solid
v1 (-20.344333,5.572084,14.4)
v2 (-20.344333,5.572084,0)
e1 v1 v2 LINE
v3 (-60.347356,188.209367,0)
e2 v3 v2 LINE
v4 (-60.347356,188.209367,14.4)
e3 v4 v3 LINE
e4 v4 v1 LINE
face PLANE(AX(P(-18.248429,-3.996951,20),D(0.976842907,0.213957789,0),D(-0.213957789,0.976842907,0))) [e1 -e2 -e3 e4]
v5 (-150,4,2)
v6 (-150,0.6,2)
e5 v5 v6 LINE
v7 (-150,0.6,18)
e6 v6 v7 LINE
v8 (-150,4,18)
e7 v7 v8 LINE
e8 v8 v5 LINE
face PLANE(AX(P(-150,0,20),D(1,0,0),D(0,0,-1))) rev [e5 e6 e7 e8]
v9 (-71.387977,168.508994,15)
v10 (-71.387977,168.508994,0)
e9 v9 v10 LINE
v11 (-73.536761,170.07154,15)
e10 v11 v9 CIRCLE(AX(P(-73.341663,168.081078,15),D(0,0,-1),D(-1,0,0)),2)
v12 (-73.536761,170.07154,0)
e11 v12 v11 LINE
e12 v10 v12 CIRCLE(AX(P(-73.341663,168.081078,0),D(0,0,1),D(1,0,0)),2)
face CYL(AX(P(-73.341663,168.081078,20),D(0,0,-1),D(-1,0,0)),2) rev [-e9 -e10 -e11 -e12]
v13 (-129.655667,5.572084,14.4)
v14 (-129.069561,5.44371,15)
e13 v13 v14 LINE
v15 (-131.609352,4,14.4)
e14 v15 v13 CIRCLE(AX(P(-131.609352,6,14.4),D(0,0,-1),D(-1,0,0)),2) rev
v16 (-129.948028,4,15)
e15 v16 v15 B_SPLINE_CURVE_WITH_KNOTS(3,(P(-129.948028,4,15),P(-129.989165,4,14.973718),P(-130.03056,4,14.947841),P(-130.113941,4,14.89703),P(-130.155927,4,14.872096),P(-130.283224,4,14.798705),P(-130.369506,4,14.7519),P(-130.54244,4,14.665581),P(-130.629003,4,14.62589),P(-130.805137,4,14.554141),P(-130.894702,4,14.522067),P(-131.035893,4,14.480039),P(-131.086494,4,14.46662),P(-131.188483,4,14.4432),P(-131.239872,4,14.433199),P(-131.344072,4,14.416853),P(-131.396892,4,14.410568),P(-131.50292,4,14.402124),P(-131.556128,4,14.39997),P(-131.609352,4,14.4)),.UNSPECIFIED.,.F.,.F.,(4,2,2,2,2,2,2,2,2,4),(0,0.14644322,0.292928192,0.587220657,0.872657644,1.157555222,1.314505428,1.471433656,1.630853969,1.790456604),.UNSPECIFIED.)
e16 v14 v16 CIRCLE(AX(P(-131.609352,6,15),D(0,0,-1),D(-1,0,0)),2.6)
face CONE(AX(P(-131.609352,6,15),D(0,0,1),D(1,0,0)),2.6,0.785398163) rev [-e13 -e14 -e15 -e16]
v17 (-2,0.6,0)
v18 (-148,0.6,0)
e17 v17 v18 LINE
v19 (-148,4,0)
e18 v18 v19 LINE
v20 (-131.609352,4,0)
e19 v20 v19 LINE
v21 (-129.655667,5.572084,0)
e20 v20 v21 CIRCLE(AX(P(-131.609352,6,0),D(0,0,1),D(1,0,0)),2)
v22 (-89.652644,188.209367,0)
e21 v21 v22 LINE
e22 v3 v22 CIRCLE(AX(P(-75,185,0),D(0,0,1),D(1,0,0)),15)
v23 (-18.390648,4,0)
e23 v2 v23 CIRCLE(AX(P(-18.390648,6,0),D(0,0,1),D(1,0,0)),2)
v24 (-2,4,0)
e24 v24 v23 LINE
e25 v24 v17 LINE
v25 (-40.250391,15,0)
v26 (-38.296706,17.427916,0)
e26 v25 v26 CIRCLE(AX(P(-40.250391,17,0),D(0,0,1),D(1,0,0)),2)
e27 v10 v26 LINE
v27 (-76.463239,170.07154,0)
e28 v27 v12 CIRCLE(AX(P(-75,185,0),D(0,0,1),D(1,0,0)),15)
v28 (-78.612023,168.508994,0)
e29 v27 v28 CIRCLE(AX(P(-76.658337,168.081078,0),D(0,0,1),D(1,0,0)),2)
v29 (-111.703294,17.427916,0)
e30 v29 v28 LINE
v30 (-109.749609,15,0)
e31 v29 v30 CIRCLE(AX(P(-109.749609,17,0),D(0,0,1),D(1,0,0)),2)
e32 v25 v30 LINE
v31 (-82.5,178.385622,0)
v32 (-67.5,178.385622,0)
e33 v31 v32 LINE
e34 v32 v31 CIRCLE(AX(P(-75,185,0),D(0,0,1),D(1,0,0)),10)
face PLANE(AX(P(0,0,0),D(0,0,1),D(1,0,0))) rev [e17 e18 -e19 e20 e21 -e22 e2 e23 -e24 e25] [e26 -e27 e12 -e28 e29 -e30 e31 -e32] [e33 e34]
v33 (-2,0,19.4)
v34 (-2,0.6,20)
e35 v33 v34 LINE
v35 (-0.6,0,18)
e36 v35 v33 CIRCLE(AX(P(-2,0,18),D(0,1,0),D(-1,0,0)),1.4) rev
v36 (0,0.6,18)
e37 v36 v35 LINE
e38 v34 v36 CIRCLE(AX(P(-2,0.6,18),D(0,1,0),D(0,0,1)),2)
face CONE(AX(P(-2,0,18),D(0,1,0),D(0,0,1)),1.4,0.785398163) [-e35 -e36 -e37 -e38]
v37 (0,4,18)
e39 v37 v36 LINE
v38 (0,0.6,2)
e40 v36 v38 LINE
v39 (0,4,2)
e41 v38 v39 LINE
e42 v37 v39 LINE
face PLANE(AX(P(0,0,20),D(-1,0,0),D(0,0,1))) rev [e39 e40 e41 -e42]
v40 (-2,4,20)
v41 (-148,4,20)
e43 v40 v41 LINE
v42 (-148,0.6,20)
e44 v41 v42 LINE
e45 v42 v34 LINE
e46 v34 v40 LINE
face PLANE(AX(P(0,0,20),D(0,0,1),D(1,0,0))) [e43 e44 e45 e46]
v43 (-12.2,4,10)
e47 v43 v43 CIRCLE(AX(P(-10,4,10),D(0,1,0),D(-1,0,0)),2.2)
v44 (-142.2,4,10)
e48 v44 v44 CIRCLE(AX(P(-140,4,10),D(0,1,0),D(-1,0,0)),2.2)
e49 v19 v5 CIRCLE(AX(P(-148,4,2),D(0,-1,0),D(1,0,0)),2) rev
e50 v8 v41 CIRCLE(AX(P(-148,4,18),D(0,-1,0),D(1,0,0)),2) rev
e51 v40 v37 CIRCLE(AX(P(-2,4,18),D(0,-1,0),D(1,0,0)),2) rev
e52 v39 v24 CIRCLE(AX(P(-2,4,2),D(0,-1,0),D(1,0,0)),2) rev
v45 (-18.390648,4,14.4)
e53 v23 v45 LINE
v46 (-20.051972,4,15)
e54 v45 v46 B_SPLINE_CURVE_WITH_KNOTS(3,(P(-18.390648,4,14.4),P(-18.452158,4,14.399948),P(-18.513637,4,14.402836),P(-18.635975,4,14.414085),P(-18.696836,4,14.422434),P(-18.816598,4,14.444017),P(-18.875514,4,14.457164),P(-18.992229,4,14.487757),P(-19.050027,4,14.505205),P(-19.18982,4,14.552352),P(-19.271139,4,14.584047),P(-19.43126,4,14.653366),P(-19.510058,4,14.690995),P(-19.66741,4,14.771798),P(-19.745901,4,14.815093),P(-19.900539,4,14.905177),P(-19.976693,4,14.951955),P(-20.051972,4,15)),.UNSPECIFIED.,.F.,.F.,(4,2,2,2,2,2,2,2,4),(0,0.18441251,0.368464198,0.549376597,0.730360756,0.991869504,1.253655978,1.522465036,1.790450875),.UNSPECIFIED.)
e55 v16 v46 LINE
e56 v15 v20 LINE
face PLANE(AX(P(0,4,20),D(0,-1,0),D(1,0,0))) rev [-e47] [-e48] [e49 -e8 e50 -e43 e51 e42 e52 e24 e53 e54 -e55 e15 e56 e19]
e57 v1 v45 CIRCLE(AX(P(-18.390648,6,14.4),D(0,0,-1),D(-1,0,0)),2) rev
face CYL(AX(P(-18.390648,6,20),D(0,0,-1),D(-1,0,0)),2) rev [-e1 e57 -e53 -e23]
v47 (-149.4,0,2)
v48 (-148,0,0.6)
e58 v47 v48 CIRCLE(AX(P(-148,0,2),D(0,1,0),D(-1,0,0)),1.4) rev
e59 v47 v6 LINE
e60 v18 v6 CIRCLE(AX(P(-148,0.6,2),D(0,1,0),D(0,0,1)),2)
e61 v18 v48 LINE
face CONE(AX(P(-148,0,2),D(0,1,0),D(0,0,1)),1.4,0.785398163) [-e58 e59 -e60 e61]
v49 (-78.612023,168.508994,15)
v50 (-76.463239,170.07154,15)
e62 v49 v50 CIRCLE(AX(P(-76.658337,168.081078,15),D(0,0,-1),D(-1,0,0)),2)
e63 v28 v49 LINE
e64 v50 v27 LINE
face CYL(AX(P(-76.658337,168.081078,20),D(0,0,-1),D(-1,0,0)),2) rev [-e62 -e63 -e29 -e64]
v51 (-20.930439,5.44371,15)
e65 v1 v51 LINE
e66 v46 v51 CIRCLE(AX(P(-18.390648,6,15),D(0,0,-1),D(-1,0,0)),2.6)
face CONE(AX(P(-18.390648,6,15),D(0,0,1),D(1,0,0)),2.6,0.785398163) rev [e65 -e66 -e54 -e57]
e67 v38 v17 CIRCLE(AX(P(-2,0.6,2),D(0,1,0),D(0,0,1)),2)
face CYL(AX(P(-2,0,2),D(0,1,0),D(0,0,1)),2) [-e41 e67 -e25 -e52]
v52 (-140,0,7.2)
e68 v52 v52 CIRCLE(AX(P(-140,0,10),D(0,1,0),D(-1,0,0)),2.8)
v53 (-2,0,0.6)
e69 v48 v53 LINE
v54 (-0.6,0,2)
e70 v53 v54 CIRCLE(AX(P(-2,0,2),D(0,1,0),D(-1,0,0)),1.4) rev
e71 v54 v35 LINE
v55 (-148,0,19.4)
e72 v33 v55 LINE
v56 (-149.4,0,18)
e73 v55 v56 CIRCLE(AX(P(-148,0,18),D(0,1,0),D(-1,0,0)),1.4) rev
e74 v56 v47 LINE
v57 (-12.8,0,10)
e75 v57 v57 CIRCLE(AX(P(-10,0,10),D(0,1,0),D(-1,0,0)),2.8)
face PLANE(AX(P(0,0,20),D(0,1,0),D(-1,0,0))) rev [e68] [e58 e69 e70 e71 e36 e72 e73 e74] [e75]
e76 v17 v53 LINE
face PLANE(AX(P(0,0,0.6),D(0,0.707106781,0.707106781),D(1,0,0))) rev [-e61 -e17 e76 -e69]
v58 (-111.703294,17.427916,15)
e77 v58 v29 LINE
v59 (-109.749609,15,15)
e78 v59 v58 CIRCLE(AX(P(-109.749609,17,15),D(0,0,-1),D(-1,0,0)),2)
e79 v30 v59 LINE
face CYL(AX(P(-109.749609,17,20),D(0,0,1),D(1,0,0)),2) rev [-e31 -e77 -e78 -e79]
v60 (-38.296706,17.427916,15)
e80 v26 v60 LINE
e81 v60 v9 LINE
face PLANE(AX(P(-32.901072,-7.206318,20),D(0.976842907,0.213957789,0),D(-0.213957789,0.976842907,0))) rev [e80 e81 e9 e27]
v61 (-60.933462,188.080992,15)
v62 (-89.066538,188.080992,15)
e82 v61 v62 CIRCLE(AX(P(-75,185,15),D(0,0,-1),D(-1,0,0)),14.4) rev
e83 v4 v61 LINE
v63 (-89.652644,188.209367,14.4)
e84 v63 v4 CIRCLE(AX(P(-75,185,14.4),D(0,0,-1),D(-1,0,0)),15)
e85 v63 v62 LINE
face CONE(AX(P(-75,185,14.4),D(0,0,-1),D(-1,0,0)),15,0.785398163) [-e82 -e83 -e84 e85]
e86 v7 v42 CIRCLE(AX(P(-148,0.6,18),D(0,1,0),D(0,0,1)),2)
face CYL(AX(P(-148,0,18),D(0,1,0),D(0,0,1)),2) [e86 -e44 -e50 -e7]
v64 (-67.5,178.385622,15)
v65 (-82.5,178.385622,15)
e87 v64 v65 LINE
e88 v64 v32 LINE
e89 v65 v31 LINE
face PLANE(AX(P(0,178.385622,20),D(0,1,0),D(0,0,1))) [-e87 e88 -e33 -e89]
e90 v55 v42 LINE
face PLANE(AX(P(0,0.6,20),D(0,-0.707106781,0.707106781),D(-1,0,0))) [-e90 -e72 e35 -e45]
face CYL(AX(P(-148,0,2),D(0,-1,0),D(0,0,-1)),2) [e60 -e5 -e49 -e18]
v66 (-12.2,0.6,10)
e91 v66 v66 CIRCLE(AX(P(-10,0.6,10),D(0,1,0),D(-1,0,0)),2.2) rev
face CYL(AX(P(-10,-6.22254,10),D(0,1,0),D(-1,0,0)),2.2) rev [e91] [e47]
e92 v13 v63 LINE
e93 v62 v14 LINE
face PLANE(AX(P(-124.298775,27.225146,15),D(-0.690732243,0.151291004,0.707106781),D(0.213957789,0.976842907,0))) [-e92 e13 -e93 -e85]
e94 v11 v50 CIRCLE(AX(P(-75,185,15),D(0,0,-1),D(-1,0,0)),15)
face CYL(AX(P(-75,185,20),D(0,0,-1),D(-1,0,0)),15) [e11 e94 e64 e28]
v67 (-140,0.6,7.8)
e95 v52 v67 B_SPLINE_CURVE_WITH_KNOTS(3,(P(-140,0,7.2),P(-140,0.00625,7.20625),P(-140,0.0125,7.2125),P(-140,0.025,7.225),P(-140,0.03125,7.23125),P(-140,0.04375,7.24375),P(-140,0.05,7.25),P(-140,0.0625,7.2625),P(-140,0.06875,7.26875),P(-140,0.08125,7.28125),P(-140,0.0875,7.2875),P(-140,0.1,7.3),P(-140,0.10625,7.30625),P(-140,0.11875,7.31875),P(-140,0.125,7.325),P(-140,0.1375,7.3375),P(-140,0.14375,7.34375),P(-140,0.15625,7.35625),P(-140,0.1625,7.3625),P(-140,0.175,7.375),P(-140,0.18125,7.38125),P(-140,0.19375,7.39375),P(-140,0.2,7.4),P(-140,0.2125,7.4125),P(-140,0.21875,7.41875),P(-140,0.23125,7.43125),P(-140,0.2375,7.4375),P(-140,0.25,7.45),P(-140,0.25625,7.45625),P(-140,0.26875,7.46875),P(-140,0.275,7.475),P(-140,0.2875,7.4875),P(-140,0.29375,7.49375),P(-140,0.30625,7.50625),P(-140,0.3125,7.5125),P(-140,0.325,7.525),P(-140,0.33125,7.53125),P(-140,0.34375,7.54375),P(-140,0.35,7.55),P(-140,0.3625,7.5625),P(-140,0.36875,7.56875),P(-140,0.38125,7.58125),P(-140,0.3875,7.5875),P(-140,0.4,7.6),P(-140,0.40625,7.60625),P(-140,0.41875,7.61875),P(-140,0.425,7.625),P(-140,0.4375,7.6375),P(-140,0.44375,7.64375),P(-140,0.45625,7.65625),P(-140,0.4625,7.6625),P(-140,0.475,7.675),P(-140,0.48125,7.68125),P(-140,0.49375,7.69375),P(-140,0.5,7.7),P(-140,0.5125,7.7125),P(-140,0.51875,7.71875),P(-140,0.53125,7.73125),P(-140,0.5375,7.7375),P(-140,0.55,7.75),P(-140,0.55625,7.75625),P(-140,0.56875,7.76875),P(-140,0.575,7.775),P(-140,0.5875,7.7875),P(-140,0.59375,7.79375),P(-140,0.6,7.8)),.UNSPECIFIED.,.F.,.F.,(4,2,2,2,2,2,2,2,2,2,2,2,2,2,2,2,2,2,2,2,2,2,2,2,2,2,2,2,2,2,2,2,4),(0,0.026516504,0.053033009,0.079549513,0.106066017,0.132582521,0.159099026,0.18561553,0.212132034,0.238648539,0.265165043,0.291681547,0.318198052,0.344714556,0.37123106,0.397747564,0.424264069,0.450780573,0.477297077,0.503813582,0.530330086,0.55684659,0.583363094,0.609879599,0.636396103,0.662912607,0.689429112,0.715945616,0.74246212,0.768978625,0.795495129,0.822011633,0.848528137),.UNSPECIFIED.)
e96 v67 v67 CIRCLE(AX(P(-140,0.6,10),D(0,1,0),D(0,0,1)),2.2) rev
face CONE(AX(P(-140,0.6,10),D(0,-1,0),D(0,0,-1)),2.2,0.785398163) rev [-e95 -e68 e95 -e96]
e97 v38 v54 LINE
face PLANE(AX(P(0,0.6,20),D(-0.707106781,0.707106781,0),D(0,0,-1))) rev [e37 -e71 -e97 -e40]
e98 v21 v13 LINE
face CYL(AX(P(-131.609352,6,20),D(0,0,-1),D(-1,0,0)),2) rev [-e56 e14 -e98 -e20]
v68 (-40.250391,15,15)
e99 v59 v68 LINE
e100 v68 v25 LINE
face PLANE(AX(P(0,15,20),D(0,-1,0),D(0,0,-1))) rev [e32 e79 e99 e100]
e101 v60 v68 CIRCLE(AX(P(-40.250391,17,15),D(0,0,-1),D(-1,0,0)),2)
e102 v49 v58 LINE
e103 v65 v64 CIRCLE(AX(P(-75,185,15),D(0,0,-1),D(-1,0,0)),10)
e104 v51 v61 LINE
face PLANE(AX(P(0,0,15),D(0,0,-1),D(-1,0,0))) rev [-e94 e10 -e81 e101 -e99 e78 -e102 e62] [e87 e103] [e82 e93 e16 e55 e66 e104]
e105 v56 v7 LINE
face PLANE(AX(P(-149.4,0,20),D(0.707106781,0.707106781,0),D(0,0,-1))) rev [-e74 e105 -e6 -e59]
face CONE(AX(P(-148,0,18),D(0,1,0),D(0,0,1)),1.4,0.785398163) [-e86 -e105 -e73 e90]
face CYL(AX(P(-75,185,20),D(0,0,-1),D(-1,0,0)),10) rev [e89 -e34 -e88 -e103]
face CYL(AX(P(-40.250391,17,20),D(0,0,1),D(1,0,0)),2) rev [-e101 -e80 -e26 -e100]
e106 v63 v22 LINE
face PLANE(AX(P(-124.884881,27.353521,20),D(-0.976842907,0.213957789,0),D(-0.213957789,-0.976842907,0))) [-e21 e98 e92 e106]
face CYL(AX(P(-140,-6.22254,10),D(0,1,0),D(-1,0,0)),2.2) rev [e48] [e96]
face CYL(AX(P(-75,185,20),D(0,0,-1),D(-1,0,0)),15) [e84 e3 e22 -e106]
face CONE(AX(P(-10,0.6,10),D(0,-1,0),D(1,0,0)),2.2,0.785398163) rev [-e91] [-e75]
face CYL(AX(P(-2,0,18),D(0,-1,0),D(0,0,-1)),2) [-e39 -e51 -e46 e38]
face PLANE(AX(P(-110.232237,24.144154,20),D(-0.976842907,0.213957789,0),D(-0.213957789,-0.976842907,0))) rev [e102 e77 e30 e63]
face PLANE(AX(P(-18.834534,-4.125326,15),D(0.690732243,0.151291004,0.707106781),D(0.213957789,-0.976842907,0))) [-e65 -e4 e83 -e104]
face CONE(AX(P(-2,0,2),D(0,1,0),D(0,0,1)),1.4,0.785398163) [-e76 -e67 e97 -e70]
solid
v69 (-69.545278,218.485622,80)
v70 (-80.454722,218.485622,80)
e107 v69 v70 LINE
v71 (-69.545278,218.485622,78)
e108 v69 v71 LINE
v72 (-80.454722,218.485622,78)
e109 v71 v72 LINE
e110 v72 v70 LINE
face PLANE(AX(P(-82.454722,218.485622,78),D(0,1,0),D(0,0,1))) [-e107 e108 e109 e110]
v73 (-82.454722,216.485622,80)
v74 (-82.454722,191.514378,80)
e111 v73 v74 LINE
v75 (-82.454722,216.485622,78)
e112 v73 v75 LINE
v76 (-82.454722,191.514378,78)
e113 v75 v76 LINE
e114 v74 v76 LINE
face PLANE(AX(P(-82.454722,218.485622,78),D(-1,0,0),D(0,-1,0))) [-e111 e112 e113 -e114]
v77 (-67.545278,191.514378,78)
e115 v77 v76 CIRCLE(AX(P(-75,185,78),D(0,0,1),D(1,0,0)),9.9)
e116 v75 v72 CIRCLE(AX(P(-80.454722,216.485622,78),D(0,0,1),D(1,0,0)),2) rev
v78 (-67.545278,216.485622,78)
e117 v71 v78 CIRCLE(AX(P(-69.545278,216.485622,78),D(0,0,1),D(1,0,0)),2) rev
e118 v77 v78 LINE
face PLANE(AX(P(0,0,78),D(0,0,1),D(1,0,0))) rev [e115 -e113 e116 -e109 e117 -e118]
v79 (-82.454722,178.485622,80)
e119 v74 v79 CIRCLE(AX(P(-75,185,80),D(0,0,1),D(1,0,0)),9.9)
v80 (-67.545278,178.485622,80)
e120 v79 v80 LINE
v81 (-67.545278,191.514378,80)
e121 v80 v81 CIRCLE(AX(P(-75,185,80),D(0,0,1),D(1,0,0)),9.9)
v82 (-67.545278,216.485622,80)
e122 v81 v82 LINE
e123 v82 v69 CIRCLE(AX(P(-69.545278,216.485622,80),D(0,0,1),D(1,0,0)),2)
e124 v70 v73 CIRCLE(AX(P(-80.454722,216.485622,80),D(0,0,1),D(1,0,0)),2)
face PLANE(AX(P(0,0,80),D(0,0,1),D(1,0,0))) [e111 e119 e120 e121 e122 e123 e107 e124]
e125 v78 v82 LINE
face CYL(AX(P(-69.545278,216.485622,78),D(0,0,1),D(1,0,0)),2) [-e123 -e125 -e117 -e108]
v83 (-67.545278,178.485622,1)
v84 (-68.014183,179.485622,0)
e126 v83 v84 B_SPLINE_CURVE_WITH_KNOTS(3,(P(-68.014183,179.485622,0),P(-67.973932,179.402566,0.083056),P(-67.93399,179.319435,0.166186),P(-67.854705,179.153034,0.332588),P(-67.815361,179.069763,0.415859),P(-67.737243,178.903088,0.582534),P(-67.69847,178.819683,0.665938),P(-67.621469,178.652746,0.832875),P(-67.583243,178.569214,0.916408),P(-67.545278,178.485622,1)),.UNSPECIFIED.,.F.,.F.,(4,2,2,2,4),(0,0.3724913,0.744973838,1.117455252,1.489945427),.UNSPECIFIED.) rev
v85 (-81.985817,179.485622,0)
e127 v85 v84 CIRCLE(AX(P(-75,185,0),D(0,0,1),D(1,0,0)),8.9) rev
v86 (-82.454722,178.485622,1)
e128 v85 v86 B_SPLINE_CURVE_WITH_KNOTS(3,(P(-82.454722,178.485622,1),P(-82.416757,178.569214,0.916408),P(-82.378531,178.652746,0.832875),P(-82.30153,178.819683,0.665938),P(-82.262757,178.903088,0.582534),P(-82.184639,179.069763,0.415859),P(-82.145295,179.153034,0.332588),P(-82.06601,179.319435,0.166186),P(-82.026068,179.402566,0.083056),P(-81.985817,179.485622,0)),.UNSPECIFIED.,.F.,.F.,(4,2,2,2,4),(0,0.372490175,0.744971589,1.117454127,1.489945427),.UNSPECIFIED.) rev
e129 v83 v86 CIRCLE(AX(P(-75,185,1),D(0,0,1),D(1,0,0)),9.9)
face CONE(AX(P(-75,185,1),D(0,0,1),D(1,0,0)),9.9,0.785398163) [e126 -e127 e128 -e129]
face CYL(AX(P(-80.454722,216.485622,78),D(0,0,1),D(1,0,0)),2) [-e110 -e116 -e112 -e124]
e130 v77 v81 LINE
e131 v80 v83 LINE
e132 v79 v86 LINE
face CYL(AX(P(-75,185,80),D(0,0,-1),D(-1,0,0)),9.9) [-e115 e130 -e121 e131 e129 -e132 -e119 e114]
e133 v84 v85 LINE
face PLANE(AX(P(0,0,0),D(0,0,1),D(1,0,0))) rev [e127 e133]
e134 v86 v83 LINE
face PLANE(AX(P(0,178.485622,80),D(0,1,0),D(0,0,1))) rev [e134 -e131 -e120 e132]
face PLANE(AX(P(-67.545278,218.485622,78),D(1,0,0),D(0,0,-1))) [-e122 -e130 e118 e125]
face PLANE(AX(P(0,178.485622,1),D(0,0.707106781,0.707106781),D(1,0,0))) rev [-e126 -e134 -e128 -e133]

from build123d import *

# Parameters (mm, degrees)
BOSS_EXTRUDE1_DEPTH = 20
SKETCH2_W           = 110
SKETCH2_H           = 232.935125723
CUT_EXTRUDE1_DEPTH  = 5
BOSS_EXTRUDE2_DEPTH = 80
SKETCH3_W           = 14.909443404
SKETCH3_H           = 40
BOSS_EXTRUDE3_DEPTH = 2
SKETCH4_R           = 2.2
CUT_EXTRUDE2_DEPTH  = 4
FILLET1_R           = 2
CHAMFER1_SIZE       = 0.6
CHAMFER2_SIZE       = 1
FILLET2_R           = 2
CHAMFER3_SIZE       = 0.6


with BuildPart() as part:
    # Sketch1 → Boss-Extrude1 (new body)
    with BuildSketch(Plane.XY):
        with BuildLine():
            Line((-60.347356399, 188.20936684), (-20, 4))
            Line((-20, 4), (0, 4))
            Line((0, 4), (0, 0))
            Line((0, 0), (-150, 0))
            Line((-150, 0), (-150, 4))
            Line((-150, 4), (-130, 4))
            Line((-130, 4), (-89.652643601, 188.20936684))
            ThreePointArc((-89.652643601, 188.20936684), (-75, 200), (-60.347356399, 188.20936684))
        make_face()
        with BuildLine():
            Line((-112.235080417, 15), (-78.20936684, 170.347356399))
            ThreePointArc((-78.20936684, 170.347356399), (-75, 170), (-71.79063316, 170.347356399))
            Line((-71.79063316, 170.347356399), (-37.764919583, 15))
            Line((-37.764919583, 15), (-112.235080417, 15))
        make_face(mode=Mode.SUBTRACT)
        with BuildLine():
            ThreePointArc((-67.5, 178.385621722), (-75, 195), (-82.5, 178.385621722))
            Line((-82.5, 178.385621722), (-67.5, 178.385621722))
        make_face(mode=Mode.SUBTRACT)
    extrude(amount=BOSS_EXTRUDE1_DEPTH)

    # Sketch2 → Cut-Extrude1 (cut)
    with BuildSketch(Plane.XY.offset(20)):
        with Locations((-75, 120.467562862)):
            Rectangle(SKETCH2_W, SKETCH2_H)
    extrude(amount=-CUT_EXTRUDE1_DEPTH, mode=Mode.SUBTRACT)

    # Sketch4 → Cut-Extrude2 (cut)
    with BuildSketch(Plane(origin=(0, 4, 0), x_dir=(1, 0, 0), z_dir=(0, 1, 0))):
        with Locations(Location((-140, -10, 0), (0, 0, 180))):
            Circle(SKETCH4_R)
        with Locations(Location((-10, -10, 0), (0, 0, 180))):
            Circle(SKETCH4_R)
    extrude(amount=-CUT_EXTRUDE2_DEPTH, mode=Mode.SUBTRACT)

    # Fillet1
    fillet1_edges = [part.edges().sort_by_distance(p)[0] for p in [
        (0, 2, 0),
        (-150, 2, 0),
        (-20, 4, 7.5),
        (-112.235080417, 15, 7.5),
        (-37.764919583, 15, 7.5),
        (-71.79063316, 170.347356399, 7.5),
        (-78.20936684, 170.347356399, 7.5),
        (-130, 4, 7.5),
        (-150, 2, 20),
        (0, 2, 20),
    ]]
    fillet(fillet1_edges, radius=FILLET1_R)

    # Chamfer1
    chamfer1_edges = [part.edges().sort_by_distance(p)[0] for p in [
        (0, 0, 10),
        (-75, 0, 0),
        (-75, 0, 20),
        (-150, 0, 10),
        (-149.414213562, 0, 0.585786438),
        (-149.414213562, 0, 19.414213562),
        (-0.585786438, 0, 19.414213562),
        (-0.585786438, 0, 0.585786438),
        (-137.8, 0, 10),
        (-7.8, 0, 10),
    ]]
    chamfer(chamfer1_edges, length=CHAMFER1_SIZE)

    # Chamfer3
    # the kernel refuses this chamfer: 0.6 mm, written as the material it takes off along each edge
    with BuildSketch(Plane(origin=(-18.390647656, 6, 15), x_dir=(-0.976842906707418, -0.21395778933098608, 0), z_dir=(-0.21395778933098608, 0.976842906707418, 0))) as chamfer3_piece_1_section:
        Polygon((2, -CHAMFER3_SIZE), (2 + CHAMFER3_SIZE, 0), (2, 0), align=None)
    chamfer3_piece_1 = revolve(axis=Axis((-18.390647656, 6, 15), (0, 0, 1)), revolution_arc=121.862799831, mode=Mode.PRIVATE)
    chamfer3_piece_1 = split(chamfer3_piece_1, bisect_by=Plane(origin=(-19.694656752, 4, 14.765716597), z_dir=(0, 1, 0)), keep=Keep.TOP, mode=Mode.PRIVATE)
    add(chamfer3_piece_1, mode=Mode.SUBTRACT)
    with BuildSketch(Plane(origin=(-131.609352344, 6, 15), x_dir=(-0.697380161967856, -0.716701409021698, 0), z_dir=(-0.716701409021698, 0.697380161967856, 0))) as chamfer3_piece_2_section:
        Polygon((2 + CHAMFER3_SIZE, 0), (2, -CHAMFER3_SIZE), (2, 0), align=None)
    chamfer3_piece_2 = revolve(axis=Axis((-131.609352344, 6, 15), (0, 0, 1)), revolution_arc=121.862799831, mode=Mode.PRIVATE)
    chamfer3_piece_2 = split(chamfer3_piece_2, bisect_by=Plane(origin=(-130.305343248, 4, 14.765716597), z_dir=(0, 1, 0)), keep=Keep.TOP, mode=Mode.PRIVATE)
    add(chamfer3_piece_2, mode=Mode.SUBTRACT)
    with BuildSketch(Plane(origin=(-129.65566653, 5.572084421, 15), x_dir=(0.9764735789240729, -0.21387689550914105, 0.02749587661058188), z_dir=(0.21395778933098342, 0.9768429067074187, 0)), Plane(origin=(-60.347356399, 188.20936684, 15), x_dir=(-0.9764735789240728, -0.21387689550914124, 0.027495876610587368), z_dir=(0.21395778933098364, -0.9768429067074186, 0))) as chamfer3_piece_3:
        Polygon((CHAMFER3_SIZE * 0.999621916911, CHAMFER3_SIZE * 0.0274958766106), (-CHAMFER3_SIZE * 0.0274958766106, CHAMFER3_SIZE * 0.999621916911), (0, 0), align=None)
    extrude(amount=186.966892184, mode=Mode.SUBTRACT)
    with BuildSketch(Plane(origin=(-75, 185, 15), x_dir=(-0.9768429067074185, 0.213957789330984, 0), z_dir=(-0.213957789330984, -0.9768429067074185, 0))) as chamfer3_piece_4:
        Polygon((15 - CHAMFER3_SIZE, 0), (15, CHAMFER3_SIZE), (15, 0), align=None)
    revolve(axis=Axis((-75, 185, 15), (0, 0, -1)), revolution_arc=155.291219427, mode=Mode.SUBTRACT)


with BuildPart() as body_2:
    # Sketch1<3> → Boss-Extrude2 (new body)
    with BuildSketch(Plane.XY):
        with BuildLine():
            Line((-82.454721702, 178.485621722), (-67.545278298, 178.485621722))
            ThreePointArc((-67.545278298, 178.485621722), (-75, 194.9), (-82.454721702, 178.485621722))
        make_face()
    extrude(amount=BOSS_EXTRUDE2_DEPTH)

    # Sketch3 → Boss-Extrude3 (add)
    with BuildSketch(Plane.XY.offset(80)):
        with Locations((-75, 198.485621722)):
            Rectangle(SKETCH3_W, SKETCH3_H)
    extrude(amount=-BOSS_EXTRUDE3_DEPTH)

    # Chamfer2
    chamfer2_edges = [body_2.edges().sort_by_distance(p)[0] for p in [
        (-75, 194.9, 0),
        (-75, 178.485621722, 0),
    ]]
    chamfer(chamfer2_edges, length=CHAMFER2_SIZE)

    # Fillet2
    fillet2_edges = [body_2.edges().sort_by_distance(p)[0] for p in [
        (-67.545278298, 218.485621722, 79),
        (-82.454721702, 218.485621722, 79),
    ]]
    fillet(fillet2_edges, radius=FILLET2_R)


solid = Compound([part.part, body_2.part])
